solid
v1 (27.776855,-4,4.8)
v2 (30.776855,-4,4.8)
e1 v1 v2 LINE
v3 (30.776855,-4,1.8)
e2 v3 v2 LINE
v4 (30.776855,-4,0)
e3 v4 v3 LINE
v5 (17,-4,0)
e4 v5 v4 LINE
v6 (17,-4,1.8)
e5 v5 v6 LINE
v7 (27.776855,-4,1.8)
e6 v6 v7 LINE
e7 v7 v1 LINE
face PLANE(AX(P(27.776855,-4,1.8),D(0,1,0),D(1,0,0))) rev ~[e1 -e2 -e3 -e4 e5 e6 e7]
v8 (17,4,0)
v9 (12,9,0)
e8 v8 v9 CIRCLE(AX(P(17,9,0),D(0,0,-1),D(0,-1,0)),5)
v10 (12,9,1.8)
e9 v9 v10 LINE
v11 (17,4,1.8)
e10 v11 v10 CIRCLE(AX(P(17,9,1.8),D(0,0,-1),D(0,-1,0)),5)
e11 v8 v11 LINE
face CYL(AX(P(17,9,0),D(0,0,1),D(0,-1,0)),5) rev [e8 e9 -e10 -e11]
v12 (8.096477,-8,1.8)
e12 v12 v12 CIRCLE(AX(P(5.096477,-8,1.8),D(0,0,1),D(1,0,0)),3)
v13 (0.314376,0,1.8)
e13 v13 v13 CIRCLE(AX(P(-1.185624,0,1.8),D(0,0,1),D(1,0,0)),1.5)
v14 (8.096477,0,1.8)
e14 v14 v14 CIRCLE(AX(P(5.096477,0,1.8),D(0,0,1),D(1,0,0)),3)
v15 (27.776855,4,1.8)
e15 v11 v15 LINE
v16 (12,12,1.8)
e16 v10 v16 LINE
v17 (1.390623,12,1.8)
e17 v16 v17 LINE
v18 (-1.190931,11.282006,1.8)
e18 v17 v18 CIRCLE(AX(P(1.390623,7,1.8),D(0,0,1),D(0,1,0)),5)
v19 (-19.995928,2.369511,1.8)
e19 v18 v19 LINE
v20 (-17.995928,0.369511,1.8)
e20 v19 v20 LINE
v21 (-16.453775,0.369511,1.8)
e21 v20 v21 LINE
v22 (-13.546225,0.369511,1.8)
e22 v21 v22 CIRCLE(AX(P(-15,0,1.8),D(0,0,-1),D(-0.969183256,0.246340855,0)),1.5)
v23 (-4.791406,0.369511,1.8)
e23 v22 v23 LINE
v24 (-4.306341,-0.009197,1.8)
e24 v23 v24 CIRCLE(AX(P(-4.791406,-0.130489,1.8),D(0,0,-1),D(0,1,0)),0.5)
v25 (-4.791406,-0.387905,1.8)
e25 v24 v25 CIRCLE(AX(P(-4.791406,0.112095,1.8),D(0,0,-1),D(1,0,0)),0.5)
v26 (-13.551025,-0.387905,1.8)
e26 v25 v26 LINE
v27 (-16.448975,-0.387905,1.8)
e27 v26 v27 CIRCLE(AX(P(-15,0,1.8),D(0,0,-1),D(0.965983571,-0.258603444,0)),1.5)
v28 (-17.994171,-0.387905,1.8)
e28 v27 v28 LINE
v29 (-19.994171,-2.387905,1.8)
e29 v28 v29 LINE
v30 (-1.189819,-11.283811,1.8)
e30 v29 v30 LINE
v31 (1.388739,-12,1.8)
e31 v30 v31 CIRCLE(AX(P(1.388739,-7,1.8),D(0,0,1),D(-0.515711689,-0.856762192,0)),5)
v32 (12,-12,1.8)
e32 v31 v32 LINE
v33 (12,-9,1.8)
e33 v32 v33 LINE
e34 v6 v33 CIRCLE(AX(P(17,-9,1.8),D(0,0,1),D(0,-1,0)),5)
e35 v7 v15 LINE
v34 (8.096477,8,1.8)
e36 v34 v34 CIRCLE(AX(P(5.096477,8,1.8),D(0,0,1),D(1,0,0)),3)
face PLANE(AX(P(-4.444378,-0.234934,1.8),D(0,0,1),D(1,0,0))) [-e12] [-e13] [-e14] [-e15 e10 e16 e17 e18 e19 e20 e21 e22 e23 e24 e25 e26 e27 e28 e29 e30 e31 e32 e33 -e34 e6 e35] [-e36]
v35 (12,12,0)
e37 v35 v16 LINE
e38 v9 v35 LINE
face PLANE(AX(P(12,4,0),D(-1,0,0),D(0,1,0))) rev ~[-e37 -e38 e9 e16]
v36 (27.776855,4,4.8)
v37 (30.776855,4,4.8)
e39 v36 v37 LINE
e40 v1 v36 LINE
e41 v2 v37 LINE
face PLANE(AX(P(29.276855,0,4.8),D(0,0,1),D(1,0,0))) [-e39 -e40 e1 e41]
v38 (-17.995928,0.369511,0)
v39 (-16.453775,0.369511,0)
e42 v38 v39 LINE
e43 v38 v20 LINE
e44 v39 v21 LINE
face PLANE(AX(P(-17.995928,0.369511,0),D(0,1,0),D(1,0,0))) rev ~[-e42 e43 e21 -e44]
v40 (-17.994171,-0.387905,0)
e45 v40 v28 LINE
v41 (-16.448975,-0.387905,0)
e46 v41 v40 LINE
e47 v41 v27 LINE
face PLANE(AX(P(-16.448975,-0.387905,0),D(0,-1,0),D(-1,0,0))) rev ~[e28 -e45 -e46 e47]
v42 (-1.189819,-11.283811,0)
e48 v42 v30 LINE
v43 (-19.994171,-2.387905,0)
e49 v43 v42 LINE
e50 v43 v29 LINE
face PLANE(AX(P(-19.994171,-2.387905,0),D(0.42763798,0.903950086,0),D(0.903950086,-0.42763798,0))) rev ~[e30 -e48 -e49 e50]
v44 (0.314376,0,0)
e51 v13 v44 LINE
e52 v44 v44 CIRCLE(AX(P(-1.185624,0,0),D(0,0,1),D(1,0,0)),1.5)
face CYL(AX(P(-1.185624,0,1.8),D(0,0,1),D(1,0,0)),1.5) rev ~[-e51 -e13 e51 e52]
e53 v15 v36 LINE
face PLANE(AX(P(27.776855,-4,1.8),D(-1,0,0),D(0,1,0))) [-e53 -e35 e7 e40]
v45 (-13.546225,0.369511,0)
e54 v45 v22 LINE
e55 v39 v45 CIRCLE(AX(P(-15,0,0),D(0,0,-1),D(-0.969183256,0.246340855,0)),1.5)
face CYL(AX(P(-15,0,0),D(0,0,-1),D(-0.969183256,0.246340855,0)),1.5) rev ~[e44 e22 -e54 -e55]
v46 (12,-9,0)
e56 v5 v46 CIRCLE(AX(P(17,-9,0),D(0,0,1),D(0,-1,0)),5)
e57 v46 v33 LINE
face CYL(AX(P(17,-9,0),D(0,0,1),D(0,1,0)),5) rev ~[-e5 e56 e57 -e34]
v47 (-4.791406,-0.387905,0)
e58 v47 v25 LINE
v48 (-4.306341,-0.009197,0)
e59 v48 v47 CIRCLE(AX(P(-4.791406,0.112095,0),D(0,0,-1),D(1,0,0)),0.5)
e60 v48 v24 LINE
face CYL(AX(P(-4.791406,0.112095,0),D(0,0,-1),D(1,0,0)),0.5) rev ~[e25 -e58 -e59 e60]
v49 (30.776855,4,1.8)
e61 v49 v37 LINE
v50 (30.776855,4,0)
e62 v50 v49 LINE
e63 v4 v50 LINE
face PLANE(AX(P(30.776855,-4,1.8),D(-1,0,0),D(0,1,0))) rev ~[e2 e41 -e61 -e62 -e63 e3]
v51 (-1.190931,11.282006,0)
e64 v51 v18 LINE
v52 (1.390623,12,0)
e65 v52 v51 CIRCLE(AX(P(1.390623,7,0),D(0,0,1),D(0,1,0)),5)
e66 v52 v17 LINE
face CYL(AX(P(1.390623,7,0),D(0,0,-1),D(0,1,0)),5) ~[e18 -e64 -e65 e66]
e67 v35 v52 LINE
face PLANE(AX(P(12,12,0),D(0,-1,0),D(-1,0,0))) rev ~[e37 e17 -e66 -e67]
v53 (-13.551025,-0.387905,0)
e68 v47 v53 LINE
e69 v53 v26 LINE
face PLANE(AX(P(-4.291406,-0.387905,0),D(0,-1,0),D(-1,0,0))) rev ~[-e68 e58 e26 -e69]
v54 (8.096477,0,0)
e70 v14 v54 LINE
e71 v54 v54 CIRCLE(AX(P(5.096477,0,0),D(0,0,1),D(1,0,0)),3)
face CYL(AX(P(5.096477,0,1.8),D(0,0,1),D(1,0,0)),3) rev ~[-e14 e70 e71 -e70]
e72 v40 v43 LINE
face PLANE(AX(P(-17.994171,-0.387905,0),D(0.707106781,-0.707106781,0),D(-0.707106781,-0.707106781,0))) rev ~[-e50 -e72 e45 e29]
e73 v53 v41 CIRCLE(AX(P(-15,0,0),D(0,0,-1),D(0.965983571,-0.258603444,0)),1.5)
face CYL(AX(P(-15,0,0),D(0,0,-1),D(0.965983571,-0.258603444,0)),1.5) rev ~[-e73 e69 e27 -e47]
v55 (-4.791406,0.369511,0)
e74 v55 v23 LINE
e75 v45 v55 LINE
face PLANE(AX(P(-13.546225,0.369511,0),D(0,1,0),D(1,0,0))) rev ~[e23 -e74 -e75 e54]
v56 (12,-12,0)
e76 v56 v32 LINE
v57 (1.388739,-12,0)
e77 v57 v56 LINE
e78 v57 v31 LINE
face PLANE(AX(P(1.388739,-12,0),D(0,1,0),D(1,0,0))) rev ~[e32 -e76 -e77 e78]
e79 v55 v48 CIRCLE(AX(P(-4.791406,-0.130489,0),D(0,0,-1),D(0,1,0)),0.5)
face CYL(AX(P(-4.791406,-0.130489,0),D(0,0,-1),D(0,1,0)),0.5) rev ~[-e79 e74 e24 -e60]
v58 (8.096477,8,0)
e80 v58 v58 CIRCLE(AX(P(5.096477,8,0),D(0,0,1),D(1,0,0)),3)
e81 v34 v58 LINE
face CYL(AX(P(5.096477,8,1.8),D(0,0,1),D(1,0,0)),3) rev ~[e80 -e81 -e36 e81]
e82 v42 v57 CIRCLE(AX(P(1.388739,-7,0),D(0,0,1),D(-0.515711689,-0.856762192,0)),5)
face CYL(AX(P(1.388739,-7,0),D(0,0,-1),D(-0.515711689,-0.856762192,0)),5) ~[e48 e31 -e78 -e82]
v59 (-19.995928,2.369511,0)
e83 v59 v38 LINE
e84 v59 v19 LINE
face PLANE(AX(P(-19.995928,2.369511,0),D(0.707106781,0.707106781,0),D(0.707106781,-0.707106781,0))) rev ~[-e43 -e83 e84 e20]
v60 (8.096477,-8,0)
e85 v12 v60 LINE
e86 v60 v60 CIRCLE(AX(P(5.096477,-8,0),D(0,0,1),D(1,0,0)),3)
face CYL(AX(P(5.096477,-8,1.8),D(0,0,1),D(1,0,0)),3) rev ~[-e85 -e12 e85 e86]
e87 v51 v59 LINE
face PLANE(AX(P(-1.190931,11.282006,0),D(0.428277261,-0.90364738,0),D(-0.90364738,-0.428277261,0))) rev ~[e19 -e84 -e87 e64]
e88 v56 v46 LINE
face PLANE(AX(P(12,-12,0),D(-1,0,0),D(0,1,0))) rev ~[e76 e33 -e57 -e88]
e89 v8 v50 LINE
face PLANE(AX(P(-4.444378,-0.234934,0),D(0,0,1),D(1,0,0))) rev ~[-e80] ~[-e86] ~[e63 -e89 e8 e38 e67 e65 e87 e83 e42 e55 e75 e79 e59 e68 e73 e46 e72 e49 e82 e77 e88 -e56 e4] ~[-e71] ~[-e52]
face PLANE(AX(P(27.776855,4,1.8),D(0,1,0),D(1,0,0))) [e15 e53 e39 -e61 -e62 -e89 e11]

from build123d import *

# Parameters (mm, degrees)
F0_W        = 18.7768550515
F0_H        = 8
F0_W_2      = 1.2231449485
F1_DEPTH    = 1.8
F2_R        = 3
F2_R_2      = 1.5
F3_DEPTH    = 1.801
F4_W        = 3
F4_H        = 8
F5_DEPTH    = 3
F6_R        = 5
F7_T1_DEPTH = 1.8


# Not quite as in the source:
# - a fillet or chamfer that OpenCascade refuses, or shapes differently, is made with other operations: its cross-section is extruded or revolved along the edge and cut away or added


with BuildPart() as f1:
    # F0 (on Top) → F1 (new body)
    with BuildSketch(Plane.XY):
        with BuildLine():
            ThreePointArc((-1.1898192428, -11.2838109608), (0.0506537792, -11.8176267396), (1.3887392017, -12))
            Line((1.3887392017, -12), (12, -12))
            Line((12, -12), (12, -4))
            Line((12, -4), (10.7768550515, -4))
            Line((10.7768550515, -4), (10.7768550515, 4))
            Line((10.7768550515, 4), (12, 4))
            Line((12, 4), (12, 12))
            Line((12, 12), (1.3906232978, 12))
            ThreePointArc((1.3906232978, 12), (0.0508527618, 11.8171583855), (-1.1909314511, 11.2820059643))
            Line((-1.1909314511, 11.2820059643), (-19.9959281202, 2.3695112828))
            Line((-19.9959281202, 2.3695112828), (-17.9959281202, 0.3695112828))
            Line((-17.9959281202, 0.3695112828), (-16.4537748835, 0.3695112828))
            ThreePointArc((-16.4537748835, 0.3695112828), (-15, 1.5), (-13.5462251165, 0.3695112828))
            Line((-13.5462251165, 0.3695112828), (-4.2914064974, 0.3695112828))
            Line((-4.2914064974, 0.3695112828), (-4.2914064974, -0.3879051656))
            Line((-4.2914064974, -0.3879051656), (-13.5510246439, -0.3879051656))
            ThreePointArc((-13.5510246439, -0.3879051656), (-15, -1.5), (-16.4489753561, -0.3879051656))
            Line((-16.4489753561, -0.3879051656), (-17.9941705506, -0.3879051656))
            Line((-17.9941705506, -0.3879051656), (-19.9941705506, -2.3879051656))
            Line((-19.9941705506, -2.3879051656), (-1.1898192428, -11.2838109608))
        make_face()
        with Locations((21.3884275258, 0)):
            Rectangle(F0_W, F0_H)
        with Locations((11.3884275258, 0)):
            Rectangle(F0_W_2, F0_H)
    extrude(amount=F1_DEPTH)

    # F2 (on face) → F3 (cut, through all)
    with BuildSketch(Plane.XY.offset(1.8)):
        with Locations((5.0964765251, 8)):
            Circle(F2_R)
        with Locations((5.0964765251, 0)):
            Circle(F2_R)
        with Locations((5.0964765251, -8)):
            Circle(F2_R)
        with Locations((-1.1856243946, 0)):
            Circle(F2_R_2)
    extrude(amount=-F3_DEPTH, mode=Mode.SUBTRACT)

    # F4 (on face) → F5 (join)
    with BuildSketch(Plane.XY.offset(1.8)):
        with Locations((29.2768550515, 0)):
            Rectangle(F4_W, F4_H)
    extrude(amount=F5_DEPTH)

    # F6
    f6_edges = [f1.edges().sort_by_distance(p)[0] for p in [
        (12, 4, 0.9),
        (12, -4, 0.9),
    ]]
    fillet(f6_edges, radius=F6_R)

    # F7: fillet of radius 0.5 on 2 edges, made by hand

    # F7_s2 → F7_t1 (join)
    with BuildSketch(Plane.XY):
        with BuildLine():
            ThreePointArc((-4.2914064974, 0.1120948344), (-4.4378531068, -0.2414585561), (-4.7914064974, -0.3879051656))
            Line((-4.7914064974, -0.3879051656), (-4.2914064974, -0.3879051656))
            Line((-4.2914064974, -0.3879051656), (-4.2914064974, 0.1120948344))
        make_face()
        with BuildLine():
            ThreePointArc((-4.7914064974, 0.3695112828), (-4.4378531068, 0.2230646734), (-4.2914064974, -0.1304887172))
            Line((-4.2914064974, -0.1304887172), (-4.2914064974, 0.3695112828))
            Line((-4.2914064974, 0.3695112828), (-4.7914064974, 0.3695112828))
        make_face()
    extrude(amount=F7_T1_DEPTH)


solid = f1.part
